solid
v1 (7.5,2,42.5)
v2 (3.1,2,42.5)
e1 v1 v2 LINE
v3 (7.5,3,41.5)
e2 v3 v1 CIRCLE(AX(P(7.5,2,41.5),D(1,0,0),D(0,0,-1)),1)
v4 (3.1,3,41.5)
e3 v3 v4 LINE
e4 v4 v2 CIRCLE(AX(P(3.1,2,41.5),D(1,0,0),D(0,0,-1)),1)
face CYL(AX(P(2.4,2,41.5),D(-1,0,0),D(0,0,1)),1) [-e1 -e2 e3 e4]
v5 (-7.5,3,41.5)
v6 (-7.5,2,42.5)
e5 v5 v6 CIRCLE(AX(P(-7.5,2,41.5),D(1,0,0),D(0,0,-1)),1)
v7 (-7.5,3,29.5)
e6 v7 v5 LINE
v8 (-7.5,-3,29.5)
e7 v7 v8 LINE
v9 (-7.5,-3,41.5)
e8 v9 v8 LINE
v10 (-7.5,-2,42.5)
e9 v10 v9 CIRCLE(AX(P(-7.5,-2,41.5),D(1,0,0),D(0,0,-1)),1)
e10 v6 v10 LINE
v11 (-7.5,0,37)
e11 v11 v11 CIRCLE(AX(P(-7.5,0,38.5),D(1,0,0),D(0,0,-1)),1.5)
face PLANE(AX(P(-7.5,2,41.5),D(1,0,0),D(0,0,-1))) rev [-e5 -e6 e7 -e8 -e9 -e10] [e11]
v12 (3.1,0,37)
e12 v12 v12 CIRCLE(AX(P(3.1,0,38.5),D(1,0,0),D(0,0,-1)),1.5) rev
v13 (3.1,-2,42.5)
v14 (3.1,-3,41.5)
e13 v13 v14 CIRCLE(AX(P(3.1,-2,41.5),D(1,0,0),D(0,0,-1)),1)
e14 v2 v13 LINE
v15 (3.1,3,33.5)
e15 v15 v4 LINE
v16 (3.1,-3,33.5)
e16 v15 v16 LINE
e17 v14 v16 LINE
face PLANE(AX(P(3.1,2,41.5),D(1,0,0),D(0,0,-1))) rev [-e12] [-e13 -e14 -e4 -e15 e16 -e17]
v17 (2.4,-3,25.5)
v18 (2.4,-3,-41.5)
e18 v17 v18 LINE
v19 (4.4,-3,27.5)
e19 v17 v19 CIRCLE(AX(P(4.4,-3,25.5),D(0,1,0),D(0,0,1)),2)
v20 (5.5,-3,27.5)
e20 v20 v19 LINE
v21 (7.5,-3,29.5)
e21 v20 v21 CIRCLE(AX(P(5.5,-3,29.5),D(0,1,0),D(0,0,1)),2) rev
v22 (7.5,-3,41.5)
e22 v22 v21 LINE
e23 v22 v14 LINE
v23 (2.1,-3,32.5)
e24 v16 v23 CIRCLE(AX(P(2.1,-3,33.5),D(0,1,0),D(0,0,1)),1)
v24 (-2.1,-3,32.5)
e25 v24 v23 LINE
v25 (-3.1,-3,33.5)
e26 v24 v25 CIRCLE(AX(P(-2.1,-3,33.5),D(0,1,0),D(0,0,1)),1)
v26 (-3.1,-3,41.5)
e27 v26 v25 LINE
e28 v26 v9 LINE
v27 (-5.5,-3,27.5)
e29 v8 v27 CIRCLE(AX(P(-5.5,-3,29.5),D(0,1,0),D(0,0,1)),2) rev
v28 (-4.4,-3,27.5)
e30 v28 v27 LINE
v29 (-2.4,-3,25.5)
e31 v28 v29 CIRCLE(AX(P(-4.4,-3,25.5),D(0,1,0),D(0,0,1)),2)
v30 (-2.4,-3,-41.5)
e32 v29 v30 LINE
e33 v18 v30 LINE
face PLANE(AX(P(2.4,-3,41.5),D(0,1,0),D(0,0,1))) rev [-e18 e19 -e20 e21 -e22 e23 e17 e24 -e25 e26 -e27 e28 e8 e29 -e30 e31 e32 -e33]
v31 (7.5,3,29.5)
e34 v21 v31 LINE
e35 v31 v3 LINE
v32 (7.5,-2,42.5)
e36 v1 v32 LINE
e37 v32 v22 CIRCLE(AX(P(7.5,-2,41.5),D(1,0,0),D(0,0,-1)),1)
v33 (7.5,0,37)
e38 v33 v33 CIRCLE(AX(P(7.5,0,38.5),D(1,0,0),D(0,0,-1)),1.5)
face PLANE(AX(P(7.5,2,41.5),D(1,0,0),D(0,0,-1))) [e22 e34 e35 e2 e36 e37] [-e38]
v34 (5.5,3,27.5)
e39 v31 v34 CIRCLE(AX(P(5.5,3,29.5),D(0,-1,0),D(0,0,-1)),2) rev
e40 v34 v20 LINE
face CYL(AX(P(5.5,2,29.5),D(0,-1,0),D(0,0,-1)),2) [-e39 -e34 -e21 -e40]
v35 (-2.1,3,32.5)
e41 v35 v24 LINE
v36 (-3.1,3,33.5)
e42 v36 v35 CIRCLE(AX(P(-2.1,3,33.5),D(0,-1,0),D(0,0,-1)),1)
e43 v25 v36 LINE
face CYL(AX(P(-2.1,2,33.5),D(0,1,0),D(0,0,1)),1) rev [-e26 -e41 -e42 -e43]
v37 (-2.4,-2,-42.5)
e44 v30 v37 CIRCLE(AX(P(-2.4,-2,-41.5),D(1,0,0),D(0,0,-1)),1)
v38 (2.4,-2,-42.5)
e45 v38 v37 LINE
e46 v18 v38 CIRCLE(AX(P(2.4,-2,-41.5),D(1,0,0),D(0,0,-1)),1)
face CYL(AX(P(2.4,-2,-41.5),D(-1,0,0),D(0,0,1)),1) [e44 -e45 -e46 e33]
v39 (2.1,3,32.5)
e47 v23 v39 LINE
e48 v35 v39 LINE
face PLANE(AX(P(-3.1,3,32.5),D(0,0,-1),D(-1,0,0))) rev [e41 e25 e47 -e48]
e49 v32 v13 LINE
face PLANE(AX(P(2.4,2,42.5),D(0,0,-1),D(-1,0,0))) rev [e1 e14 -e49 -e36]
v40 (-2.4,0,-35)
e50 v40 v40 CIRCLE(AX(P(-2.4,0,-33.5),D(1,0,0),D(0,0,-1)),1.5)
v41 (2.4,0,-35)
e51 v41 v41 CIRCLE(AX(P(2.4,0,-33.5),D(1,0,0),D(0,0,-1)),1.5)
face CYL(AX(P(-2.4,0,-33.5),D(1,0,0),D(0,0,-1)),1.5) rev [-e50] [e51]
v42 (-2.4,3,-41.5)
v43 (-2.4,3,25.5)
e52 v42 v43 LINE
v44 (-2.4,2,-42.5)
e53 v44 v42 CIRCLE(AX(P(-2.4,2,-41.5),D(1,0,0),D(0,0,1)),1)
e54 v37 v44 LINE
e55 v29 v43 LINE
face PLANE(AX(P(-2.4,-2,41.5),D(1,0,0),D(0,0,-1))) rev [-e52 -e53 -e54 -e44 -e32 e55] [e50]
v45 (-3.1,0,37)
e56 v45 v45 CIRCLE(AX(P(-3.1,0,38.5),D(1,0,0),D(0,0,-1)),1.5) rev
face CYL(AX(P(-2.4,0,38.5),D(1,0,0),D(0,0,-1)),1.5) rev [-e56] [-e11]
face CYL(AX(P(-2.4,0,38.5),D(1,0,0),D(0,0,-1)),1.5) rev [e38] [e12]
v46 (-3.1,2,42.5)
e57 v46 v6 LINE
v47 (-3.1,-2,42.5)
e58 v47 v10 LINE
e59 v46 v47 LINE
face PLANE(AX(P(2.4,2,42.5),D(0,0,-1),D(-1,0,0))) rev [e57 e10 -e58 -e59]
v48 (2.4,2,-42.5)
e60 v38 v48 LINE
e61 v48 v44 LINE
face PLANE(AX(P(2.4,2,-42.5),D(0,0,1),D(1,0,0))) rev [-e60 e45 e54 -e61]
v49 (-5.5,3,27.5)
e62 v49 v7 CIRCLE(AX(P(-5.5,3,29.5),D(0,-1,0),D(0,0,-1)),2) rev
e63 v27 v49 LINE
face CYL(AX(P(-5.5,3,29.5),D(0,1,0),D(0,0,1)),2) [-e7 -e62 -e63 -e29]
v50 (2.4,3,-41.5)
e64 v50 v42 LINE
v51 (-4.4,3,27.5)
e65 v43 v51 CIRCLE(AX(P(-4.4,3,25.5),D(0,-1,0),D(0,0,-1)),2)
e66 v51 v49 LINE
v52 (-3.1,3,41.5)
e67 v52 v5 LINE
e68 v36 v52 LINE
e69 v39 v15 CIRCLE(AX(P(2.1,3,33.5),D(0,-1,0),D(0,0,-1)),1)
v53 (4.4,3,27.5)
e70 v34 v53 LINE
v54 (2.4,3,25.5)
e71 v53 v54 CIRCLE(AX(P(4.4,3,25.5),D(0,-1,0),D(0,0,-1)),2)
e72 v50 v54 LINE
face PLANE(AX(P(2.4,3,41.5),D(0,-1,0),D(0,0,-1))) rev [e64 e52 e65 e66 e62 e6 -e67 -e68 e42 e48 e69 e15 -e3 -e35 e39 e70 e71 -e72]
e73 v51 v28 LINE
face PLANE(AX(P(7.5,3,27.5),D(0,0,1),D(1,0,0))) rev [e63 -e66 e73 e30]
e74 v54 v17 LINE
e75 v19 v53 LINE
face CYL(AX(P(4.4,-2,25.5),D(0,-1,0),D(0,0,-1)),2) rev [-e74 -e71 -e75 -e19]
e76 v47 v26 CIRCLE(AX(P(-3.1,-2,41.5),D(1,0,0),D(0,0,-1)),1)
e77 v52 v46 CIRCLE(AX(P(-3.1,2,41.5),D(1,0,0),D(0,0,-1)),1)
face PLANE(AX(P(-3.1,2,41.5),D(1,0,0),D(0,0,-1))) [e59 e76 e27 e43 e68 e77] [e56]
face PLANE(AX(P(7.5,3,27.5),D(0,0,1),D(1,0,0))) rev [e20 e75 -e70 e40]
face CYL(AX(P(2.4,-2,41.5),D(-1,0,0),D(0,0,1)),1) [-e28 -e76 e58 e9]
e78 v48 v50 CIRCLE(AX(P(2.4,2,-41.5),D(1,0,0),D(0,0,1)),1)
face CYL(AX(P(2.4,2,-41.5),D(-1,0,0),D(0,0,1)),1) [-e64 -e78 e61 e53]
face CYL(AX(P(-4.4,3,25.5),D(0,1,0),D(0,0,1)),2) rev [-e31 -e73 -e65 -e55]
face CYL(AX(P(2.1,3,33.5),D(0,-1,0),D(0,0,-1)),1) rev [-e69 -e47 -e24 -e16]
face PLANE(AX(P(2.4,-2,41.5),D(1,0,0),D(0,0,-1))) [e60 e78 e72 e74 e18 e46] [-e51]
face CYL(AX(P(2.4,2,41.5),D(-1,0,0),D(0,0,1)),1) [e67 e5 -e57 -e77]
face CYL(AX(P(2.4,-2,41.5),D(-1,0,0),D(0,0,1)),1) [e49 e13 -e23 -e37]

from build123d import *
from build123d.topology import SkipClean

# Parameters (mm, degrees)
SALIENTE_EXTRUIR1_DEPTH    = 2.4
CORTAR_EXTRUIR1_DEPTH      = 43.673293756
CORTAR_EXTRUIR1_DEPTH_BACK = 43.673293756
CROQUIS2_R                 = 1.5
CROQUIS3_R                 = 1.5
SALIENTE_EXTRUIR2_DEPTH    = 7.5
CORTAR_EXTRUIR2_DEPTH      = 3.1
REDONDEO1_R                = 2
REDONDEO2_R                = 1


with BuildPart() as part:
    # Croquis1 → Saliente-Extruir1 (new, symmetric)
    with BuildSketch(Plane(origin=(0, 0, 0), x_dir=(0, 0, -1), z_dir=(1, 0, 0))):
        with BuildLine():
            Line((-41.5, 3), (41.5, 3))
            ThreePointArc((41.5, 3), (42.207106781, 2.707106781), (42.5, 2))
            Line((42.5, 2), (42.5, -2))
            ThreePointArc((42.5, -2), (42.207106781, -2.707106781), (41.5, -3))
            Line((41.5, -3), (-41.5, -3))
            ThreePointArc((-41.5, -3), (-42.207106781, -2.707106781), (-42.5, -2))
            Line((-42.5, -2), (-42.5, 2))
            ThreePointArc((-42.5, 2), (-42.207106781, 2.707106781), (-41.5, 3))
        make_face()
    extrude(amount=SALIENTE_EXTRUIR1_DEPTH, both=True)

    # Croquis2 → Cortar-Extruir1 (cut, two sides: drawn at the far end of the back side and taken through both)
    with BuildSketch(Plane(origin=(0, 0, 0), x_dir=(0, 0, -1), z_dir=(1, 0, 0)).offset(-CORTAR_EXTRUIR1_DEPTH_BACK)):
        with Locations((-38.5, 0)):
            Circle(CROQUIS2_R)
        with Locations((33.5, 0)):
            Circle(CROQUIS2_R)
    extrude(amount=CORTAR_EXTRUIR1_DEPTH + CORTAR_EXTRUIR1_DEPTH_BACK, mode=Mode.SUBTRACT)

    # Croquis3 → Saliente-Extruir2 (add, symmetric)
    with SkipClean():  # the faces are left unmerged after this step: merging them gives an invalid solid
        with BuildSketch(Plane(origin=(0, 0, 0), x_dir=(0, 0, -1), z_dir=(1, 0, 0))):
            with BuildLine():
                Line((-42.5, 2), (-42.5, -2))
                ThreePointArc((-42.5, -2), (-42.207106781, -2.707106781), (-41.5, -3))
                Line((-41.5, -3), (-27.5, -3))
                Line((-27.5, -3), (-27.5, 3))
                Line((-27.5, 3), (-41.5, 3))
                ThreePointArc((-41.5, 3), (-42.207106781, 2.707106781), (-42.5, 2))
            make_face()
            with Locations((-38.5, 0)):
                Circle(CROQUIS3_R, mode=Mode.SUBTRACT)
        extrude(amount=SALIENTE_EXTRUIR2_DEPTH, both=True)
    add(part.part.scale(1), mode=Mode.REPLACE)  # the faces are merged on a copy

    # Croquis4 → Cortar-Extruir2 (cut, symmetric)
    with BuildSketch(Plane(origin=(0, 0, 0), x_dir=(0, 0, -1), z_dir=(1, 0, 0))):
        with BuildLine():
            Line((-41.5, 3), (-32.5, 3))
            Line((-32.5, 3), (-32.5, -3))
            Line((-32.5, -3), (-41.5, -3))
            ThreePointArc((-41.5, -3), (-42.207106781, -2.707106781), (-42.5, -2))
            Line((-42.5, -2), (-42.5, 2))
            ThreePointArc((-42.5, 2), (-42.207106781, 2.707106781), (-41.5, 3))
        make_face()
    extrude(amount=CORTAR_EXTRUIR2_DEPTH, both=True, mode=Mode.SUBTRACT)

    # Redondeo1
    redondeo1_edges = [part.edges().sort_by_distance(p)[0] for p in [
        (-2.4, 0, 27.5),
        (2.4, 0, 27.5),
        (-7.5, 0, 27.5),
        (7.5, 0, 27.5),
    ]]
    fillet(redondeo1_edges, radius=REDONDEO1_R)

    # Redondeo2
    redondeo2_edges = [part.edges().sort_by_distance(p)[0] for p in [
        (3.1, 0, 32.5),
        (-3.1, 0, 32.5),
    ]]
    fillet(redondeo2_edges, radius=REDONDEO2_R)


solid = part.part
